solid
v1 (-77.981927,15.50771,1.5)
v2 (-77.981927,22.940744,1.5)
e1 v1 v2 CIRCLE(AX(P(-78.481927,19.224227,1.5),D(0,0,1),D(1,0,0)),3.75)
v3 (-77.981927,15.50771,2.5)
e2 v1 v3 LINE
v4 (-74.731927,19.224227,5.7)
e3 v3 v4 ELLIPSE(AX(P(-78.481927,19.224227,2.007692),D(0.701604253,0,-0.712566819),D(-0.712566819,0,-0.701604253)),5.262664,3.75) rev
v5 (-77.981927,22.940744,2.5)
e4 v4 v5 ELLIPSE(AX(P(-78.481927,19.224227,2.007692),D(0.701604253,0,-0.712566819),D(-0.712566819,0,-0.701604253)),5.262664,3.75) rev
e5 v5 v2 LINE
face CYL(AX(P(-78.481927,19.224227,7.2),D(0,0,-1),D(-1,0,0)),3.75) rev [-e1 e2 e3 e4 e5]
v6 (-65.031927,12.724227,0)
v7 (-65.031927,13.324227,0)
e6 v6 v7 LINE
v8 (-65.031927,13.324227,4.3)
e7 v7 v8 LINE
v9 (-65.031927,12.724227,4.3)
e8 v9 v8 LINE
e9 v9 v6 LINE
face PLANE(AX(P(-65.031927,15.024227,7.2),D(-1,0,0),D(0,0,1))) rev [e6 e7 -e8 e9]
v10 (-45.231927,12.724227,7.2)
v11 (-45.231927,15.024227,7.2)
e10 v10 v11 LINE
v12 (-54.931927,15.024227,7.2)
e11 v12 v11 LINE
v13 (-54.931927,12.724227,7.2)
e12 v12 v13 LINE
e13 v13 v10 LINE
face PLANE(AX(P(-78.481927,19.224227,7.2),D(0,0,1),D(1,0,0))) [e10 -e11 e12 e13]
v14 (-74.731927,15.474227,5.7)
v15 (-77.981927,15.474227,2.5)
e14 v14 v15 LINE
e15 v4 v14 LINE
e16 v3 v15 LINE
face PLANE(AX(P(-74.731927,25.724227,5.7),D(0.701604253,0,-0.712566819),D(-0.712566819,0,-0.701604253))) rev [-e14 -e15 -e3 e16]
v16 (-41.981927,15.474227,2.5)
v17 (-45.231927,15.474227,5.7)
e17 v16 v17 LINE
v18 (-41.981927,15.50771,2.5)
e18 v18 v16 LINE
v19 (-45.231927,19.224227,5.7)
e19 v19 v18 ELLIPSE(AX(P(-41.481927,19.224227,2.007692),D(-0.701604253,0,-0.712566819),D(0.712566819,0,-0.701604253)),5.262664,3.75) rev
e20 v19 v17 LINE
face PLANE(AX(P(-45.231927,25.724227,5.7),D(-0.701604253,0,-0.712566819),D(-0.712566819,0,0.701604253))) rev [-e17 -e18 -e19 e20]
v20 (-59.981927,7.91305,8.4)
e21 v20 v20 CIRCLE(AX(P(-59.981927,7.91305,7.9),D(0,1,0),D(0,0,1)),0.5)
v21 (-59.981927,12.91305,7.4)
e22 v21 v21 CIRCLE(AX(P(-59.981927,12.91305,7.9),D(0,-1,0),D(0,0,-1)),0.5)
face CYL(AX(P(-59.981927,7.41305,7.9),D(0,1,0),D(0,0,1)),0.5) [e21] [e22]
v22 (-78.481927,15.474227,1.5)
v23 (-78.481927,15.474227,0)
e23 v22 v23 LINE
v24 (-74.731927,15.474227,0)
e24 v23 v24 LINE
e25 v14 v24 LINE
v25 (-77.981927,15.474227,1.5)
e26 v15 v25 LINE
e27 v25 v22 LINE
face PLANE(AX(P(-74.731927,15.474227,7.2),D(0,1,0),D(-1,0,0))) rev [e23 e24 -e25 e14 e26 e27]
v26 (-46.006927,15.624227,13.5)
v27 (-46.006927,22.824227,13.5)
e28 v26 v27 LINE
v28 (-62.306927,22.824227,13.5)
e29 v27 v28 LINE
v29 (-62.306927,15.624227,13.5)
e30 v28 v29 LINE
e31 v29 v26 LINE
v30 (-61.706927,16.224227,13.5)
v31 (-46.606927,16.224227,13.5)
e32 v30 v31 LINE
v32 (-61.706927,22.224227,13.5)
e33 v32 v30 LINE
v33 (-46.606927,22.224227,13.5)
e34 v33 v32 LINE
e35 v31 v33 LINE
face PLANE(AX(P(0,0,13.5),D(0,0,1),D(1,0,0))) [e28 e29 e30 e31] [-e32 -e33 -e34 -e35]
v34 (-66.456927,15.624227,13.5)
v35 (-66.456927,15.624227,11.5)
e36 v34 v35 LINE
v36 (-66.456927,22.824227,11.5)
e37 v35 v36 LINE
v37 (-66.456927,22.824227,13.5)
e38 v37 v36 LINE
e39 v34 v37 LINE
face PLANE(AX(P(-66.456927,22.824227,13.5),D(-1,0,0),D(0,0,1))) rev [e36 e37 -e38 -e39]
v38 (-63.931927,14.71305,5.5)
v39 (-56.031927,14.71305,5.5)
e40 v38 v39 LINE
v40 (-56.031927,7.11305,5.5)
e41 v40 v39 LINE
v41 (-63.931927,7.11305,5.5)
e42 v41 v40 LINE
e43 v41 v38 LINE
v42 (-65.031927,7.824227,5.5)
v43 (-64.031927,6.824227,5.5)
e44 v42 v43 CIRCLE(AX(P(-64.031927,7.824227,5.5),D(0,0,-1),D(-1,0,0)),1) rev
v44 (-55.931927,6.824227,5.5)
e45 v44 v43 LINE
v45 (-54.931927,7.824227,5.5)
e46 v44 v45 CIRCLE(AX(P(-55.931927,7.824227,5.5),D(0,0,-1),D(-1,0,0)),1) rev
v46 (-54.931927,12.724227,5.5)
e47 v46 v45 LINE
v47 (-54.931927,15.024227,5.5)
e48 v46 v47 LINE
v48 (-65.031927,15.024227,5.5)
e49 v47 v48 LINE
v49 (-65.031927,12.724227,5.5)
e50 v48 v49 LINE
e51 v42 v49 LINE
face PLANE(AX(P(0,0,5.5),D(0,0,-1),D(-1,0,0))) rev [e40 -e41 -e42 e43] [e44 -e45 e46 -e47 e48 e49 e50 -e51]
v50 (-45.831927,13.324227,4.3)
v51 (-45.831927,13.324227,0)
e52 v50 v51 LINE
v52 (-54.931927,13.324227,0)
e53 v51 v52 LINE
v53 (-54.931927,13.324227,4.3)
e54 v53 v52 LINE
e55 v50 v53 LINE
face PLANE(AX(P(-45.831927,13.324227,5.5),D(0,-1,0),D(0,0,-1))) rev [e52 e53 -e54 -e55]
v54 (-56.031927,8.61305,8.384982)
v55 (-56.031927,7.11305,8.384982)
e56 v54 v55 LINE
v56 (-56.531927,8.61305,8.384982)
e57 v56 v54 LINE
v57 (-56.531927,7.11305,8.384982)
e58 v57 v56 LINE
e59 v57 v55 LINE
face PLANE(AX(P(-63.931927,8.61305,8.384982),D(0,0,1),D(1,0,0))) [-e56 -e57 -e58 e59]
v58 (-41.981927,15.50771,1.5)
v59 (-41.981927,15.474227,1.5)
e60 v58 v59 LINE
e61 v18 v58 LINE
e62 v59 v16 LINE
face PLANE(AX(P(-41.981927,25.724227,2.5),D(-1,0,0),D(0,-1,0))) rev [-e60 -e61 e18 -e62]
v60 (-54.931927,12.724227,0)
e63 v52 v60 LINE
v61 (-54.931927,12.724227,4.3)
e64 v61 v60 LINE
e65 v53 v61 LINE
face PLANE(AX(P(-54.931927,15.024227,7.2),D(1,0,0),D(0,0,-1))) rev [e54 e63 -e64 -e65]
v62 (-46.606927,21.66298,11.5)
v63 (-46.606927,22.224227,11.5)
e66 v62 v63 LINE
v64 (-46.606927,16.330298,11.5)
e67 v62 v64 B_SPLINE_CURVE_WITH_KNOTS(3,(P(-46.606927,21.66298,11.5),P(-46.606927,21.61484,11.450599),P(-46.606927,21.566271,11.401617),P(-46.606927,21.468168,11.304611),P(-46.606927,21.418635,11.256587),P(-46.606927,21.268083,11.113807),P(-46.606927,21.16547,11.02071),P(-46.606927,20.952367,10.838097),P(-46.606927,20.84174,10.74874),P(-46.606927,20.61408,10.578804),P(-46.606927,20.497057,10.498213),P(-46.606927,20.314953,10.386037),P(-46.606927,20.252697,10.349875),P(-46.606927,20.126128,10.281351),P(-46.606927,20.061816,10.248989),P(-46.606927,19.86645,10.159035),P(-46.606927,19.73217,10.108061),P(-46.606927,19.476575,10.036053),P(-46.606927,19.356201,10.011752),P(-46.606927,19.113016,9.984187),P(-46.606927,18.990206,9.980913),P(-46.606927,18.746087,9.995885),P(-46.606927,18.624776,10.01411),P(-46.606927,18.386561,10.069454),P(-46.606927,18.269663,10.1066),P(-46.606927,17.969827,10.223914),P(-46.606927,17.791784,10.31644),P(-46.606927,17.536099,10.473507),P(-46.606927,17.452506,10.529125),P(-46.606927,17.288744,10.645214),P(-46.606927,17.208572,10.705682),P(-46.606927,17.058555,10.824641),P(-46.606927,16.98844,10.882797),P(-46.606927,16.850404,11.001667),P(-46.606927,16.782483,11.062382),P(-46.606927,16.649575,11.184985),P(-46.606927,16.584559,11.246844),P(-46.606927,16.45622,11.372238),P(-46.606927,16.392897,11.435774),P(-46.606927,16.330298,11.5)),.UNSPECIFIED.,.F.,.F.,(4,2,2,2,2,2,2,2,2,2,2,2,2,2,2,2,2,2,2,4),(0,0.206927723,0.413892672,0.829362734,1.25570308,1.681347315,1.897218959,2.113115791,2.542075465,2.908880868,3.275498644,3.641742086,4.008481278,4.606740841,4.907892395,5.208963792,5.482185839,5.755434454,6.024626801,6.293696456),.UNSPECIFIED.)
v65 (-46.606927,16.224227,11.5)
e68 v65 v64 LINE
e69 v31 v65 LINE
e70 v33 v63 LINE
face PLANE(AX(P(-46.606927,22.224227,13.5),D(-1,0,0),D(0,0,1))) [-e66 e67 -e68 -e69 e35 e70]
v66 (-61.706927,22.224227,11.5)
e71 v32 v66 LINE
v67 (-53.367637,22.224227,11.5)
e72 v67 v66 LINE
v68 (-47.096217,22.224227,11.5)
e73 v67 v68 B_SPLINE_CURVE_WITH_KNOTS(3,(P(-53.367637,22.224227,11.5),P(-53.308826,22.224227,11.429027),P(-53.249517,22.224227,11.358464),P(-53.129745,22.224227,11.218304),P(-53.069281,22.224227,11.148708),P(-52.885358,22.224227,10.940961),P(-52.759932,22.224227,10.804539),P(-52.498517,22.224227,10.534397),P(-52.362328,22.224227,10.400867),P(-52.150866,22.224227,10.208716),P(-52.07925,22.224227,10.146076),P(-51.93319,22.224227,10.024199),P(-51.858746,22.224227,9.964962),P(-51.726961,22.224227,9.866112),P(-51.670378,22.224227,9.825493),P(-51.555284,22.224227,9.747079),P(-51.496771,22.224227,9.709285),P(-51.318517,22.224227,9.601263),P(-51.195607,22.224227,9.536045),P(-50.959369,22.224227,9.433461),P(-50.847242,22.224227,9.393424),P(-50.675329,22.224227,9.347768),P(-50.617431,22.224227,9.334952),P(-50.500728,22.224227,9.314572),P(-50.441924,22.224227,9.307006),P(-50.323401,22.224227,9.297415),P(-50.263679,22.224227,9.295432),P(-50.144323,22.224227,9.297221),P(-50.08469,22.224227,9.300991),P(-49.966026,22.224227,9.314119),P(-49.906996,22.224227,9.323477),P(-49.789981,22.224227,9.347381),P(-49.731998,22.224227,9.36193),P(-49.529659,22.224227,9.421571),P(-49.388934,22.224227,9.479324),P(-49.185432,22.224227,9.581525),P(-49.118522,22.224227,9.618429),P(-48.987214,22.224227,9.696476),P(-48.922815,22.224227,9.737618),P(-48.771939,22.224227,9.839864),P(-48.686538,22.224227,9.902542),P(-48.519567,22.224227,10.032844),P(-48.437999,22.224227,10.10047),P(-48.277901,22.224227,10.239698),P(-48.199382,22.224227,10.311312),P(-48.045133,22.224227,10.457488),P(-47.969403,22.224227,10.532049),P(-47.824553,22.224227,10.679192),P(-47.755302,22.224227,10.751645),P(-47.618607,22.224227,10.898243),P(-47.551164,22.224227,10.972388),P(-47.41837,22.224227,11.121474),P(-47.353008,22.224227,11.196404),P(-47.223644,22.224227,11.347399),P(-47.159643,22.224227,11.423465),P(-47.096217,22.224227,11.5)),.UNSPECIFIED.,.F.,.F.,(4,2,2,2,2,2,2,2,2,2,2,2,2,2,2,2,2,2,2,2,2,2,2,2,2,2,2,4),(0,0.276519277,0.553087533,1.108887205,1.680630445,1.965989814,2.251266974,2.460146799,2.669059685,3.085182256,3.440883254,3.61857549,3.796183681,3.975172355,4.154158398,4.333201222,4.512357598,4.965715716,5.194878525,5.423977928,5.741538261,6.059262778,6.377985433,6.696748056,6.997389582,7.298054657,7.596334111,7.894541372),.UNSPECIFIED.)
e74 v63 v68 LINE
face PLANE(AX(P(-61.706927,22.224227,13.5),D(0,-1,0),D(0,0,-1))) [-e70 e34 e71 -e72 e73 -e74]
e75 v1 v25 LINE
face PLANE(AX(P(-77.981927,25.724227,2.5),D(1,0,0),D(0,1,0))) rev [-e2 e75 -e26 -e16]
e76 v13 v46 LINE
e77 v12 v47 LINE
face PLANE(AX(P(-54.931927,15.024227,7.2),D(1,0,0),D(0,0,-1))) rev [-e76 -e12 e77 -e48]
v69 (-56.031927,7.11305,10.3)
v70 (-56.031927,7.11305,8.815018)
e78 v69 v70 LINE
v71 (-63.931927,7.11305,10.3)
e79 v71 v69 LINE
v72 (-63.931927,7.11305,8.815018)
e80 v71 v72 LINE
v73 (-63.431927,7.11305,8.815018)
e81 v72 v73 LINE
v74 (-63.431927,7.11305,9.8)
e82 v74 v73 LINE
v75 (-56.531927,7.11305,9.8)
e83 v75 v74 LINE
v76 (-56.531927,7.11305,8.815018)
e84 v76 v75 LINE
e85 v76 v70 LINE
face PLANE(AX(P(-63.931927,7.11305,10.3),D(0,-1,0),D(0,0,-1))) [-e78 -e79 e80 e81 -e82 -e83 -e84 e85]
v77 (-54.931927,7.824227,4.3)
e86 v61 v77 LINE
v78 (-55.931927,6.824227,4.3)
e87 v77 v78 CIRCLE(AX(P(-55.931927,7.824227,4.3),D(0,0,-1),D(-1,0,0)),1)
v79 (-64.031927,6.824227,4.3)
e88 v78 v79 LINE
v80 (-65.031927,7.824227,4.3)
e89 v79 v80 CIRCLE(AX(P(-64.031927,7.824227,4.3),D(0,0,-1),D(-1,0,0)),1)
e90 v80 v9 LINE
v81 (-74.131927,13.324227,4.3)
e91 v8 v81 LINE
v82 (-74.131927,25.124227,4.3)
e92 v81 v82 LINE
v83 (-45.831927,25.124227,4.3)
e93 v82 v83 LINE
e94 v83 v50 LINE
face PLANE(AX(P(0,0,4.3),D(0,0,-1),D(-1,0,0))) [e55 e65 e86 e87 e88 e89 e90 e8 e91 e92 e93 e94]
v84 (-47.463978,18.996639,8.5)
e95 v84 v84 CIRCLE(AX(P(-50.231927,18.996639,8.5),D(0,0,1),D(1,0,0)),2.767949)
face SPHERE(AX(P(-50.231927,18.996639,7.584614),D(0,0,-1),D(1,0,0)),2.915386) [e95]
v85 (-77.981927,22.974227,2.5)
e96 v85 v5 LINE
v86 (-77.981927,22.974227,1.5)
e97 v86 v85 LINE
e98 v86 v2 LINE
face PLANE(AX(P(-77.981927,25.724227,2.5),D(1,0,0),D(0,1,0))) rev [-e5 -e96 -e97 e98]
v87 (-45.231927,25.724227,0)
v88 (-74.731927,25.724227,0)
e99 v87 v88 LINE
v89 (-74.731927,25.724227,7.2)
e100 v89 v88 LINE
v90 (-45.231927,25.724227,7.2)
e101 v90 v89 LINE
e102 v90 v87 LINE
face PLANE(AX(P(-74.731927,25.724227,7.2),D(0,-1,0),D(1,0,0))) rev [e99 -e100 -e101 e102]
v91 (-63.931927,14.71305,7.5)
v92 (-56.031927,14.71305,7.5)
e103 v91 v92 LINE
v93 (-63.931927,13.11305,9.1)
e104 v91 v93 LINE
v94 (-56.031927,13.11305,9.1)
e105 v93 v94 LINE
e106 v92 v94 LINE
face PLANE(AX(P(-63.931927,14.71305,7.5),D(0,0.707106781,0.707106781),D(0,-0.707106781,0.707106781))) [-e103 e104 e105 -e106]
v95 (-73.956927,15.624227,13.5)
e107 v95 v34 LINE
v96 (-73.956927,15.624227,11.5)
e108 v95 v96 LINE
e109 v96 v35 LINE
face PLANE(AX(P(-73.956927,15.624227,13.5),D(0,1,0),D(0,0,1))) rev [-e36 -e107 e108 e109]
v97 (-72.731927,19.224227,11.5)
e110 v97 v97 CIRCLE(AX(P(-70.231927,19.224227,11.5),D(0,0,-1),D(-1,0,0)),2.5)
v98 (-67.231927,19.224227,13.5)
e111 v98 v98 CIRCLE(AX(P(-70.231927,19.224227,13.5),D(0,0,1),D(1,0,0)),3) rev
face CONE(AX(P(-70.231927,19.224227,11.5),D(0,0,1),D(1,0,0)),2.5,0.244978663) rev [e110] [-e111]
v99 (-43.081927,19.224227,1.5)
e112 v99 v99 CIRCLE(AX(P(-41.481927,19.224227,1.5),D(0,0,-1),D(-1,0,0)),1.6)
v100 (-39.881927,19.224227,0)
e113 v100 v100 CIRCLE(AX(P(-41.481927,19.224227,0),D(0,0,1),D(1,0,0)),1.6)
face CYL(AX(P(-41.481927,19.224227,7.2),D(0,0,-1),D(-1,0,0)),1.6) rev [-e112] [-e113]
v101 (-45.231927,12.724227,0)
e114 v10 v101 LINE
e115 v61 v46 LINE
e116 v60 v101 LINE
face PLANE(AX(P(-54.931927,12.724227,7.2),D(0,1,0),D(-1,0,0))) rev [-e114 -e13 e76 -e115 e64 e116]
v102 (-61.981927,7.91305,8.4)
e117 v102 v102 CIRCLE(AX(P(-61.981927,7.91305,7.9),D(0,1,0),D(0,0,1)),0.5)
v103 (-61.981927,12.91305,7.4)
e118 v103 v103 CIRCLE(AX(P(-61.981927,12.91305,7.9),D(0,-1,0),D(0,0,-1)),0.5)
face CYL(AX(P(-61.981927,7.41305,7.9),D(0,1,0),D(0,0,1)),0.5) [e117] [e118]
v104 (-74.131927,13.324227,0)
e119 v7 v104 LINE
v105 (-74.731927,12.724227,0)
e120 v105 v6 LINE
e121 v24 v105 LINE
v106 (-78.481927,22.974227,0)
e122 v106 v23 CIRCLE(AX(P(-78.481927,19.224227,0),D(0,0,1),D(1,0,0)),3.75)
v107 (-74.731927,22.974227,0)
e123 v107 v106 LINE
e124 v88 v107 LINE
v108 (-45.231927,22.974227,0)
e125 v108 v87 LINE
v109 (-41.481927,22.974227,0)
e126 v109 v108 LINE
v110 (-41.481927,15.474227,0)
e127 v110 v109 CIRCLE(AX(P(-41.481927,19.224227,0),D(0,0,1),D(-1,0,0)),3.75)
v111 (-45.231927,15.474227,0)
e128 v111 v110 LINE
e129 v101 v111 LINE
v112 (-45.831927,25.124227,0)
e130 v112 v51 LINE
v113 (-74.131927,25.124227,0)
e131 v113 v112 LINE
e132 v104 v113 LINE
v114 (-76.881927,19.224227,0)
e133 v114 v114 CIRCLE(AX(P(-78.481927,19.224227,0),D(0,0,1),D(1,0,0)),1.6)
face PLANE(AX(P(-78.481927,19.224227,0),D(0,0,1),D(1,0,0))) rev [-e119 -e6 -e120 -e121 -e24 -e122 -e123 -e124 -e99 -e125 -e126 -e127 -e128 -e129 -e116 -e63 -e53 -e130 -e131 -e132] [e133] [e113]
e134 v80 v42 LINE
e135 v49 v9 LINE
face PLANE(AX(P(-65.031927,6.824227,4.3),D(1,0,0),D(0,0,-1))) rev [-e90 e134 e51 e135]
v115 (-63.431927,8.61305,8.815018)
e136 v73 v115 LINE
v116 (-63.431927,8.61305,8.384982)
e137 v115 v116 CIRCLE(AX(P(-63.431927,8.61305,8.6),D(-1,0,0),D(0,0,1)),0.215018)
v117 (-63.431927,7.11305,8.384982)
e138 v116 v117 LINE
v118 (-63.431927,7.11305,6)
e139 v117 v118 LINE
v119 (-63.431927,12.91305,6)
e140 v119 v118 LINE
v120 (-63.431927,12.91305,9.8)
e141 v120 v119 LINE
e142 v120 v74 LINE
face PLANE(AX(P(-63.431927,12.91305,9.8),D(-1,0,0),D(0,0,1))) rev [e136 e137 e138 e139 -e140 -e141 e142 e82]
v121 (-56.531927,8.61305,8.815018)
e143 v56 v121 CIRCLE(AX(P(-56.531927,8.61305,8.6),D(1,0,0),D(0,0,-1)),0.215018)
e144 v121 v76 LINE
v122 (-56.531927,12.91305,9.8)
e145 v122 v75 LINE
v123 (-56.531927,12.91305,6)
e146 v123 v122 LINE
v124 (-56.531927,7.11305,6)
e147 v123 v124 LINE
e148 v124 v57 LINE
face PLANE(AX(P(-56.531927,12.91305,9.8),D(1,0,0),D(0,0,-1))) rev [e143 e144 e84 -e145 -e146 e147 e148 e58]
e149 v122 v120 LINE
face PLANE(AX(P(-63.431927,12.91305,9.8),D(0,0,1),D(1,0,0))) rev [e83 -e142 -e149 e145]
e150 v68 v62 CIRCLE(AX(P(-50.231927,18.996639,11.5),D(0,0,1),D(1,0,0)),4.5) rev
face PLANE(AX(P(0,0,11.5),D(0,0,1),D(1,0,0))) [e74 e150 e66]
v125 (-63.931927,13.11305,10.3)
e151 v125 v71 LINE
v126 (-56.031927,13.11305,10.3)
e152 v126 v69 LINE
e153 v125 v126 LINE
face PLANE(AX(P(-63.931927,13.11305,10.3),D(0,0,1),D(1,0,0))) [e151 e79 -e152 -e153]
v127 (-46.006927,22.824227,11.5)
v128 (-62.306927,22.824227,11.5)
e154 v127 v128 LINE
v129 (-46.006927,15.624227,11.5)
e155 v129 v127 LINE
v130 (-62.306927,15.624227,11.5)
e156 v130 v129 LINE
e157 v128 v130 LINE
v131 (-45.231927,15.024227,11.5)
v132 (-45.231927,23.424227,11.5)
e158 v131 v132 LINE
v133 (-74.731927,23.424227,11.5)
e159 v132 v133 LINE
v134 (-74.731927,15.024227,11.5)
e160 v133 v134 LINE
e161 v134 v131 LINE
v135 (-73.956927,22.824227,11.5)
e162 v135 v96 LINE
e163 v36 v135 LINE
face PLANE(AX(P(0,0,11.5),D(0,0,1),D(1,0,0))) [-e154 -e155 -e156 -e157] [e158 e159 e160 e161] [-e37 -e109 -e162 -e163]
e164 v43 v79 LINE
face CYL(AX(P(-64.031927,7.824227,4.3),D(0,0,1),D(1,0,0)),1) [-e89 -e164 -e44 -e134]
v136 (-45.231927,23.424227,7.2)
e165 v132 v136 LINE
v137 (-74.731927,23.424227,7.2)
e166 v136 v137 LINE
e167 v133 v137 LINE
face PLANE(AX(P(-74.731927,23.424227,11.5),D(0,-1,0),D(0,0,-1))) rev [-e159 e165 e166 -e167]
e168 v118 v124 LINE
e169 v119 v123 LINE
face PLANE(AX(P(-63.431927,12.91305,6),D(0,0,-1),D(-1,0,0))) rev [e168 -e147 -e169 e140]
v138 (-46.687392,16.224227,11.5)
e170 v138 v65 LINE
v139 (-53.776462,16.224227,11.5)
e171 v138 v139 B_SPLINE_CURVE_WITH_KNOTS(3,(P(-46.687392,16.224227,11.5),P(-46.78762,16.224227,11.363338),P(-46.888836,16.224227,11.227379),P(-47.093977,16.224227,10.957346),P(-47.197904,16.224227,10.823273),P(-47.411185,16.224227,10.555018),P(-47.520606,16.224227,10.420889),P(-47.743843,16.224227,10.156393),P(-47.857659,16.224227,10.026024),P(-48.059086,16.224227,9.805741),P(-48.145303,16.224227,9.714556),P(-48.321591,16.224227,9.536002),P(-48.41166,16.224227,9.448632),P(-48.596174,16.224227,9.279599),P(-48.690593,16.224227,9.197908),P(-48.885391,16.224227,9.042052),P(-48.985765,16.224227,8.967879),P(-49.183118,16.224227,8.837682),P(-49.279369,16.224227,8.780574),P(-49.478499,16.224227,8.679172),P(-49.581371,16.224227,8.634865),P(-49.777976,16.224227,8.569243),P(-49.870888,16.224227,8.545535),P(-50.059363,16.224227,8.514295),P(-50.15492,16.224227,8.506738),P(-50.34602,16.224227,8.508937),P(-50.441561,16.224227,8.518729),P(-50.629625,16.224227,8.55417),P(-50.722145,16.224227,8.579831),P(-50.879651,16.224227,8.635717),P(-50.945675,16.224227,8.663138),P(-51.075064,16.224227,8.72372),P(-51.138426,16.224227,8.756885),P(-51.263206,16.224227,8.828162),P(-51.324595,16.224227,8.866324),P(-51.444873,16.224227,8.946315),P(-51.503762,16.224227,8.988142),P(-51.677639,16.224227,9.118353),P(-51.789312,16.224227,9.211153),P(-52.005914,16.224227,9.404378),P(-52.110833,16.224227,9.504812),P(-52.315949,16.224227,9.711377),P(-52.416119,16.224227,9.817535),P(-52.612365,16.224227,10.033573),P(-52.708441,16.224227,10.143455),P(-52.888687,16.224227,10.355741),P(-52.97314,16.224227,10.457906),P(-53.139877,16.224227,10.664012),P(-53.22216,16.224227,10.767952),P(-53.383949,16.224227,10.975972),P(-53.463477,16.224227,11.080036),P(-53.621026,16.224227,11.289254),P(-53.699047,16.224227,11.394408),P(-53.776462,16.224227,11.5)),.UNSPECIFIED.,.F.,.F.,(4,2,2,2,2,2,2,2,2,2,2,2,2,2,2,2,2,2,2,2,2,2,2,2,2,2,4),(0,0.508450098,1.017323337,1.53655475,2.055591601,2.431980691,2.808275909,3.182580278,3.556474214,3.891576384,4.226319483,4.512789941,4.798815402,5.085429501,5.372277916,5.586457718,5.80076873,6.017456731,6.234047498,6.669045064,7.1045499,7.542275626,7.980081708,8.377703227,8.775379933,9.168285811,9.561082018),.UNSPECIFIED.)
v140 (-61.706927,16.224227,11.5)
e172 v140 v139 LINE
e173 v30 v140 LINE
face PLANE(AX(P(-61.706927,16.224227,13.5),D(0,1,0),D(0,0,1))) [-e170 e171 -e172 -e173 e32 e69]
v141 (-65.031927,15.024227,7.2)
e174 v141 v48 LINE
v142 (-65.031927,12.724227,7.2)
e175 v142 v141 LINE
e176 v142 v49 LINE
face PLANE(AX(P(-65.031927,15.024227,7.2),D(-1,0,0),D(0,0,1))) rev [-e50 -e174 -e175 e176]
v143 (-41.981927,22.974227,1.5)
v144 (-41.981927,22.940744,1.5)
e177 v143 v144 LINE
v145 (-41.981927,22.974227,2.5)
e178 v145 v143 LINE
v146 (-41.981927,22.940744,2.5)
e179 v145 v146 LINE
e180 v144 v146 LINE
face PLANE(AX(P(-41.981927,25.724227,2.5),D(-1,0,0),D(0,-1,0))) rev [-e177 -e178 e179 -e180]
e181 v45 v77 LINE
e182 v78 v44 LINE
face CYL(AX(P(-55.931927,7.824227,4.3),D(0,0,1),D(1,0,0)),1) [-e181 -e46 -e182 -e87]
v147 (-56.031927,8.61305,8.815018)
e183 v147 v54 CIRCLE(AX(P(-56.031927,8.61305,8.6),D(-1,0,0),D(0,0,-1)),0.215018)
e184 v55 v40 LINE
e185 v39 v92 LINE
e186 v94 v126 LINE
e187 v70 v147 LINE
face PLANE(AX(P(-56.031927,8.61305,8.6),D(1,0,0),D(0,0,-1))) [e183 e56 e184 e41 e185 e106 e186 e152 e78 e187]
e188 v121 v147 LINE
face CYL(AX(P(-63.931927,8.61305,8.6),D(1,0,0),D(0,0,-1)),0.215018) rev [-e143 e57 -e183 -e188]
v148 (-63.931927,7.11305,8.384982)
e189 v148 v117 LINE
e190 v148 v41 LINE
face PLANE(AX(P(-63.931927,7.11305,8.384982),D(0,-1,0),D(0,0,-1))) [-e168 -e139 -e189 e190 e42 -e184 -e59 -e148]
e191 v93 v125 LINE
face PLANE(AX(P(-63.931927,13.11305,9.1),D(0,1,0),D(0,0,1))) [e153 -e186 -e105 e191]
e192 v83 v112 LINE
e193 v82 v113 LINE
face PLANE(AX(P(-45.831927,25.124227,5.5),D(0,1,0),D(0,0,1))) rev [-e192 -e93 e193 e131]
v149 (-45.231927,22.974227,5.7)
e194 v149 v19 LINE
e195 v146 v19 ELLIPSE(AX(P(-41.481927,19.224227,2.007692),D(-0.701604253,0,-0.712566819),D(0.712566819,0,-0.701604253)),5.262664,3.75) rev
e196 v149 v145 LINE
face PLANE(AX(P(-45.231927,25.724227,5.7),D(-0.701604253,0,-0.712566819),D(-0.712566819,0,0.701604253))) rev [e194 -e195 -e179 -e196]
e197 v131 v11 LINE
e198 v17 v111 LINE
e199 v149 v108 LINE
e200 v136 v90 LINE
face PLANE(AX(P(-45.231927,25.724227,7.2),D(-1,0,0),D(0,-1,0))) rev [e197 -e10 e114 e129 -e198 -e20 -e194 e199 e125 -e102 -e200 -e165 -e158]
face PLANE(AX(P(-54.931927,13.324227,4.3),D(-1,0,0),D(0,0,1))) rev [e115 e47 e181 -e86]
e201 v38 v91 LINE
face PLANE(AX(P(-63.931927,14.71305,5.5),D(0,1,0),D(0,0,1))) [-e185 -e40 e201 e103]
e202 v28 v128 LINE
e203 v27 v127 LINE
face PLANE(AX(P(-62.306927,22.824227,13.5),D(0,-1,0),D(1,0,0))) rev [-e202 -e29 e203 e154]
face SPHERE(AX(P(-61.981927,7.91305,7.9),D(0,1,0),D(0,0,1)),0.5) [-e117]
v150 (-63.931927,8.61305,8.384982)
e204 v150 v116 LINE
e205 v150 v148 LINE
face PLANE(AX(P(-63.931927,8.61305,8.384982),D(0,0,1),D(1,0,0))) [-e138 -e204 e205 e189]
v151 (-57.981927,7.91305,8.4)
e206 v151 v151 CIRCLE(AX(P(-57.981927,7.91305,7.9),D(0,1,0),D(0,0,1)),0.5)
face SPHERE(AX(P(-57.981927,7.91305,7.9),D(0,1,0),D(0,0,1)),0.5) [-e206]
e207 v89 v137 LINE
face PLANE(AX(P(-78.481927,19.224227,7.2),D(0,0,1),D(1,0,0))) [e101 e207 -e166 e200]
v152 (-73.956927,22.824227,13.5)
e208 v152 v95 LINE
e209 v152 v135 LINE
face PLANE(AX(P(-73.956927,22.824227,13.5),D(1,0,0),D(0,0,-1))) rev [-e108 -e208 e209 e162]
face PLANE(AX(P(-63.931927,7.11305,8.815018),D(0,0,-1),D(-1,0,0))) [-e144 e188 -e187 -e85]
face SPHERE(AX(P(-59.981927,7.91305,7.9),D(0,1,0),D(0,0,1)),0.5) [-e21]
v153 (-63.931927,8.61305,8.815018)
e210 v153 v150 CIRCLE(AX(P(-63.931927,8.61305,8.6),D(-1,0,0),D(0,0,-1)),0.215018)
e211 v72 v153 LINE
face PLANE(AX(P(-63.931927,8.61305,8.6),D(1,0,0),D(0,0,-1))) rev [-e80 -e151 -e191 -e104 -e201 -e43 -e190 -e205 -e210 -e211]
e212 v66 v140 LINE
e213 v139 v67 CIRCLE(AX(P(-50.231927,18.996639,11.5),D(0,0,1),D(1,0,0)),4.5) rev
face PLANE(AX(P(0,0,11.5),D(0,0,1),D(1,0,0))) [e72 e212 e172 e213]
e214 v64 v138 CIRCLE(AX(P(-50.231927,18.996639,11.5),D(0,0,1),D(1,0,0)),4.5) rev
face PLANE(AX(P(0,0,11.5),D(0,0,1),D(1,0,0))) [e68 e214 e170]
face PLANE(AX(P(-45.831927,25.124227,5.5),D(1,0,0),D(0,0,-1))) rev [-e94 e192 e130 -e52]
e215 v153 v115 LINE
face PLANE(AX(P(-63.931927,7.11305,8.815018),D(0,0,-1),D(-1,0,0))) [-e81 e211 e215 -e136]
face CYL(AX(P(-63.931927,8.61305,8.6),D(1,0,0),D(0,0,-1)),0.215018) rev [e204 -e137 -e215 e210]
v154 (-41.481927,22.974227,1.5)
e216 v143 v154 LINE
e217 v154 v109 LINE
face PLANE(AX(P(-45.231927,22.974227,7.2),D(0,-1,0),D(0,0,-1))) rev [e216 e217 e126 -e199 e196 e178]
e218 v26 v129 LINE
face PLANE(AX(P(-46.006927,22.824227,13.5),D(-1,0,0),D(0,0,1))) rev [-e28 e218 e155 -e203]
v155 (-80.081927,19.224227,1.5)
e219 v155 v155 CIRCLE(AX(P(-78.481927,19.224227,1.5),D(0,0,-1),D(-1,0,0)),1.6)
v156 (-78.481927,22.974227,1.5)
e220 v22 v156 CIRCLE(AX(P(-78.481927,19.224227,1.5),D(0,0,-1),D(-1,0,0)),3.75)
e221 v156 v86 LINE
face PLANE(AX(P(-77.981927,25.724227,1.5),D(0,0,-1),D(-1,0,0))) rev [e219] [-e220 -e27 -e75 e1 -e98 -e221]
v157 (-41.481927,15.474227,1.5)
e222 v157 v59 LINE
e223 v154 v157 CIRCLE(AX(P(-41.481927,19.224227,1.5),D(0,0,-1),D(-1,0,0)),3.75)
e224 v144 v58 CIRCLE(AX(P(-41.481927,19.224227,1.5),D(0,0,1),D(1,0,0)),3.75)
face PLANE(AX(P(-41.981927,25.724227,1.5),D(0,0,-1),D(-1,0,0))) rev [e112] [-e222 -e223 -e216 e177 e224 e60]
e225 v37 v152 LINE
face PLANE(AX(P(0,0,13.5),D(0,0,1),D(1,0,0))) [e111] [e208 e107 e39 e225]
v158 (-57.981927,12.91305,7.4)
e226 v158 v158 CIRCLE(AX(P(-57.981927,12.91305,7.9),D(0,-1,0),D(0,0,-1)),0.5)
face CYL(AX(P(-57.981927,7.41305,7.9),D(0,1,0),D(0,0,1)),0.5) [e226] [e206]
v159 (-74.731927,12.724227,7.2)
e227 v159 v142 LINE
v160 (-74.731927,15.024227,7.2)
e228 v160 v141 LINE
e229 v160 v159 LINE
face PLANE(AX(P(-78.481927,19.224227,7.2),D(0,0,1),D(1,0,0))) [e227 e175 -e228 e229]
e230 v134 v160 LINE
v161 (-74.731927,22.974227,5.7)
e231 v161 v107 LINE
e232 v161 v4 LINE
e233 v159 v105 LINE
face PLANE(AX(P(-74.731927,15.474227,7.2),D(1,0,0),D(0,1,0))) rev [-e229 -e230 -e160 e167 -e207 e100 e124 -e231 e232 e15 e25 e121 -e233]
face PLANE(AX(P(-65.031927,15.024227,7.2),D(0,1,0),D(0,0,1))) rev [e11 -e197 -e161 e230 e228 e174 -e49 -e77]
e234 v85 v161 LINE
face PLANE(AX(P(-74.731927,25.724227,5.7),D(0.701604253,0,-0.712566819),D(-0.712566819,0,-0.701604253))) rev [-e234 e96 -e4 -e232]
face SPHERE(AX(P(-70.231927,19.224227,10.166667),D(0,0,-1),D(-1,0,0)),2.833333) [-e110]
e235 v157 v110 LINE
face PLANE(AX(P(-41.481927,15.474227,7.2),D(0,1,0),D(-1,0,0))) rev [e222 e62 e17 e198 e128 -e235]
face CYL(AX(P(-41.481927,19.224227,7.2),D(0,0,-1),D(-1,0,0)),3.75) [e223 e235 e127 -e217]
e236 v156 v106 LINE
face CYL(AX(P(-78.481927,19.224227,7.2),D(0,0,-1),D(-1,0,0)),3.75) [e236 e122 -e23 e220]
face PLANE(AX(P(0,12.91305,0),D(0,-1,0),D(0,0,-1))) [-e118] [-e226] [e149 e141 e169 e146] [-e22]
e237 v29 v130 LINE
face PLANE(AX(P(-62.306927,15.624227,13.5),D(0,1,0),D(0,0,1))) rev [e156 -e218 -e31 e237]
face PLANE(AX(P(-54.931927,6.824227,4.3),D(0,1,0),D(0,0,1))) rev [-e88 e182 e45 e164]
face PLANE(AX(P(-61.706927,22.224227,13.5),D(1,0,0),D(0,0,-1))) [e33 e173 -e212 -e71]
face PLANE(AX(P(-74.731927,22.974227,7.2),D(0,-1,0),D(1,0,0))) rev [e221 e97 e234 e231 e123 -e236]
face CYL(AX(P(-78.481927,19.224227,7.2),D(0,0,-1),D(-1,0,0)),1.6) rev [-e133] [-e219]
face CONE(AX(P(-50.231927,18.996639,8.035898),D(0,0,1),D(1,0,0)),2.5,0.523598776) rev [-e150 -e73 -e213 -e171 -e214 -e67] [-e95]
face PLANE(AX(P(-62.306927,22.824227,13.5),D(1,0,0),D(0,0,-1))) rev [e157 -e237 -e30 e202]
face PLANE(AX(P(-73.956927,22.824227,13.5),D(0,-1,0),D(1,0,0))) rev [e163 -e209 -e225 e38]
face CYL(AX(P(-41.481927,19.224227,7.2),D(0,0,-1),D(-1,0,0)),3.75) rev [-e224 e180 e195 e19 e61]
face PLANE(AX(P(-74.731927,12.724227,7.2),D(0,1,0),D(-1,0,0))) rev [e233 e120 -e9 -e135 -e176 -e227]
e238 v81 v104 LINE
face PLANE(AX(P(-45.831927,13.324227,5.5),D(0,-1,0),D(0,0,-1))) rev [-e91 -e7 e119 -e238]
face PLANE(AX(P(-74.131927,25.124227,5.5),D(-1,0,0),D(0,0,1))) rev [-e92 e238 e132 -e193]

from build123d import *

# Parameters (mm, degrees)
SKETCH2_R                = 1.6
BOSS_EXTRUDE1_DEPTH      = 7.2
CUT_EXTRUDE1_DEPTH       = 84.563926387
SKETCH5_R                = 3.75
CUT_EXTRUDE2_DEPTH       = 87.349960246
SKETCH6_W                = 29.5
SKETCH6_H                = 8.4
BOSS_EXTRUDE2_DEPTH      = 4.3
SKETCH7_W                = 7.5
SKETCH7_H                = 7.2
SKETCH7_R                = 2.5
SKETCH7_W_2              = 16.3
SKETCH7_W_3              = 15.1
SKETCH7_H_2              = 6
BOSS_EXTRUDE3_DEPTH      = 2
CHAMFER1_SIZE2           = 2
CHAMFER1_SIZE            = 0.5
SKETCH8_R                = 2.5
CUT_EXTRUDE3_DEPTH       = 3
CHAMFER2_SIZE            = 2
CHAMFER2_SIZE_2          = 3.464101615
SKETCH9_W                = 28.3
SKETCH9_H                = 11.8
CUT_EXTRUDE4_DEPTH       = 5.5
BOSS_EXTRUDE4_DEPTH      = 1.2
FILLET1_R                = 1
BOSS_EXTRUDE5_DEPTH      = 3.95
BOSS_EXTRUDE5_DEPTH_BACK = 3.95
SKETCH17_W               = 6.9
SKETCH17_H               = 3.8
CUT_EXTRUDE5_DEPTH       = 5.8
SKETCH18_R               = 0.5
BOSS_EXTRUDE6_DEPTH      = 5.5
FILLET2_R                = 0.5


# Some blends are built 0.0001 mm under size
with BuildPart() as part:
    # Sketch2 → Boss-Extrude1 (new body)
    with BuildSketch(Plane.XY):
        with BuildLine():
            Line((-74.731926848, 25.724226739), (-45.231926848, 25.724226739))
            Line((-45.231926848, 25.724226739), (-45.231926848, 22.974226739))
            Line((-45.231926848, 22.974226739), (-41.481926848, 22.974226739))
            ThreePointArc((-41.481926848, 22.974226739), (-37.731926848, 19.224226739), (-41.481926848, 15.474226739))
            Line((-41.481926848, 15.474226739), (-45.231926848, 15.474226739))
            Line((-45.231926848, 15.474226739), (-45.231926848, 12.724226739))
            Line((-45.231926848, 12.724226739), (-54.931926848, 12.724226739))
            Line((-54.931926848, 12.724226739), (-54.931926848, 15.024226739))
            Line((-54.931926848, 15.024226739), (-65.031926848, 15.024226739))
            Line((-65.031926848, 15.024226739), (-65.031926848, 12.724226739))
            Line((-65.031926848, 12.724226739), (-74.731926848, 12.724226739))
            Line((-74.731926848, 12.724226739), (-74.731926848, 15.474226739))
            Line((-74.731926848, 15.474226739), (-78.481926848, 15.474226739))
            ThreePointArc((-78.481926848, 15.474226739), (-82.231926848, 19.224226739), (-78.481926848, 22.974226739))
            Line((-78.481926848, 22.974226739), (-74.731926848, 22.974226739))
            Line((-74.731926848, 22.974226739), (-74.731926848, 25.724226739))
        make_face()
        with Locations((-78.481926848, 19.224226739)):
            Circle(SKETCH2_R, mode=Mode.SUBTRACT)
        with Locations((-41.481926848, 19.224226739)):
            Circle(SKETCH2_R, mode=Mode.SUBTRACT)
    extrude(amount=BOSS_EXTRUDE1_DEPTH)

    # Sketch4 → Cut-Extrude1 (cut, through all)
    with BuildSketch(Plane.XZ.offset(-12.724226739)):
        Polygon((-74.731926848, 5.7), (-77.981926848, 2.5), (-77.981926848, 1.5), (-84.83036896, 1.5), (-84.83036896, 9.527639916), (-74.731926848, 9.527639916), align=None)
        Polygon((-45.231926848, 9.527639916), (-45.231926848, 5.7), (-41.981926848, 2.5), (-41.981926848, 1.5), (-35.133484736, 1.5), (-35.133484736, 9.527639916), align=None)
    extrude(amount=-CUT_EXTRUDE1_DEPTH, mode=Mode.SUBTRACT)

    # Sketch5 → Cut-Extrude2 (cut, through all)
    with BuildSketch(Plane.XY.offset(1.5)):
        with Locations((-78.481926848, 19.224226739)):
            Circle(SKETCH5_R)
        with Locations((-41.481926848, 19.224226739)):
            Circle(SKETCH5_R)
    extrude(amount=CUT_EXTRUDE2_DEPTH, mode=Mode.SUBTRACT)

    # Sketch6 → Boss-Extrude2 (add)
    with BuildSketch(Plane.XY.offset(7.2)):
        with Locations((-59.981926848, 19.224226739)):
            Rectangle(SKETCH6_W, SKETCH6_H)
    extrude(amount=BOSS_EXTRUDE2_DEPTH)

    # Sketch7 → Boss-Extrude3 (add)
    # profile 1 of 2: a face of its own
    with BuildSketch(Plane.XY.offset(11.5)):
        with Locations((-70.206926848, 19.224226739)):
            Rectangle(SKETCH7_W, SKETCH7_H)
        with Locations((-70.231926848, 19.224226739)):
            Circle(SKETCH7_R, mode=Mode.SUBTRACT)
    # profile 2 of 2: a face of its own
    with BuildSketch(Plane.XY.offset(11.5)):
        with Locations((-54.156926848, 19.224226739)):
            Rectangle(SKETCH7_W_2, SKETCH7_H)
        with Locations((-54.156926848, 19.224226739)):
            Rectangle(SKETCH7_W_3, SKETCH7_H_2, mode=Mode.SUBTRACT)
    extrude(amount=BOSS_EXTRUDE3_DEPTH)

    # Chamfer1
    chamfer1_edges = [part.edges().sort_by_distance(p)[0] for p in [
        (-72.731926848, 19.224226739, 13.5),
    ]]
    chamfer1_side = [part.faces().sort_by_distance(p)[0] for p in [
        (-72.741926848, 19.224226739, 13.5),
    ]]
    chamfer(chamfer1_edges, length=CHAMFER1_SIZE - 0.0001, length2=CHAMFER1_SIZE2 - 0.0001, reference=chamfer1_side[0])  # a hair under: the kernel refuses the full size

    # Sketch8 → Cut-Extrude3 (cut)
    with BuildSketch(Plane.XY.offset(11.5)):
        with Locations((-50.231926848, 18.99663901)):
            Circle(SKETCH8_R)
    extrude(amount=-CUT_EXTRUDE3_DEPTH, mode=Mode.SUBTRACT)

    # Chamfer2
    # the kernel refuses this chamfer: 3.464101615, 2 mm, written as the material it takes off along each edge
    with BuildSketch(Plane(origin=(-50.231926848, 18.99663901, 11.5), x_dir=(1, 0, 0), z_dir=(0, -1, 0))) as chamfer2_piece_1_section:
        Polygon((2.5 + CHAMFER2_SIZE, 0), (2.5, -CHAMFER2_SIZE_2), (2.5, 0), align=None)
    chamfer2_piece_1 = revolve(axis=Axis((-50.231926848, 18.99663901, 11.5), (0, 0, 1)), mode=Mode.PRIVATE)
    chamfer2_piece_1 = split(chamfer2_piece_1, bisect_by=Plane(origin=(-53.833665029, 16.224226739, 10.018611703), z_dir=(0, 1, 0)), keep=Keep.TOP, mode=Mode.PRIVATE)
    chamfer2_piece_1 = split(chamfer2_piece_1, bisect_by=Plane(origin=(-46.606926848, 18.99663901, 10.018611703), z_dir=(-1, 0, 0)), keep=Keep.TOP, mode=Mode.PRIVATE)
    chamfer2_piece_1 = split(chamfer2_piece_1, bisect_by=Plane(origin=(-53.833665029, 22.224226739, 10.018611703), z_dir=(0, -1, 0)), keep=Keep.TOP, mode=Mode.PRIVATE)
    chamfer2_piece_1 = split(chamfer2_piece_1, bisect_by=Plane(origin=(-53.833665029, 18.99663901, 8.5), z_dir=(0, 0, 1)), keep=Keep.TOP, mode=Mode.PRIVATE)
    add(chamfer2_piece_1, mode=Mode.SUBTRACT)

    # Sketch9 → Cut-Extrude4 (cut)
    with BuildSketch(Plane(origin=(0, 0, 0), x_dir=(-1, 0, 0), z_dir=(0, 0, -1))):
        with Locations((59.981926848, 19.224226739)):
            Rectangle(SKETCH9_W, SKETCH9_H)
    extrude(amount=-CUT_EXTRUDE4_DEPTH, mode=Mode.SUBTRACT)

    # Sketch10 → Boss-Extrude4 (add)
    with BuildSketch(Plane(origin=(0, 0, 5.5), x_dir=(-1, 0, 0), z_dir=(0, 0, -1))):
        Polygon((54.931926848, 13.324226739), (54.931926848, 6.824226739), (65.031926848, 6.824226739), (65.031926848, 13.324226739), (74.131926848, 13.324226739), (74.131926848, 25.124226739), (45.831926848, 25.124226739), (45.831926848, 13.324226739), align=None)
    extrude(amount=BOSS_EXTRUDE4_DEPTH)

    # Sketch11 → Revolve1 (revolve)
    with BuildSketch(Plane(origin=(0, 18.99663901, 0), x_dir=(1, 0, 0), z_dir=(0, 1, 0))):
        with BuildLine():
            Line((-50.231926848, -8.5), (-47.463977656, -8.5))
            ThreePointArc((-47.463977656, -8.5), (-48.524476795, -9.947681814), (-50.231926848, -10.5))
            Line((-50.231926848, -10.5), (-50.231926848, -8.5))
        make_face()
    revolve(axis=Axis((-50.231926848, 18.99663901, 8.5), (0, 0, 1)))

    # Sketch14 → Revolve2 (revolve)
    with BuildSketch(Plane(origin=(0, 19.224226739, 0), x_dir=(-1, 0, 0), z_dir=(0, -1, 0)), mode=Mode.PRIVATE) as revolve2_sk:
        with BuildLine():
            Line((70.231926848, -11.5), (72.731926848, -11.5))
            ThreePointArc((72.731926848, -11.5), (71.689664822, -12.596229956), (70.231926848, -13))
            Line((70.231926848, -13), (70.231926848, -11.5))
        make_face()
    revolve(revolve2_sk.sketch.rotate(Axis((-70.231926848, 19.224226739, 11.5), (0, 0, 1)), 180), axis=Axis((-70.231926848, 19.224226739, 11.5), (0, 0, 1)))

    # Fillet1
    fillet1_edges = [part.edges().sort_by_distance(p)[0] for p in [
        (-65.031926848, 6.824226739, 4.9),
        (-54.931926848, 6.824226739, 4.9),
    ]]
    fillet(fillet1_edges, radius=FILLET1_R)

    # Sketch16 → Boss-Extrude5 (add, two sides: drawn at the far end of the back side and taken through both)
    with BuildSketch(Plane(origin=(-59.981926848, 0, 0), x_dir=(0, 0, -1), z_dir=(1, 0, 0)).offset(-BOSS_EXTRUDE5_DEPTH_BACK)):
        with BuildLine():
            Line((-8.384982209, 8.613050121), (-8.384982209, 7.113050121))
            Line((-8.384982209, 7.113050121), (-5.5, 7.113050121))
            Line((-5.5, 7.113050121), (-5.5, 14.713050121))
            Line((-5.5, 14.713050121), (-7.5, 14.713050121))
            Line((-7.5, 14.713050121), (-9.1, 13.113050121))
            Line((-9.1, 13.113050121), (-10.3, 13.113050121))
            Line((-10.3, 13.113050121), (-10.3, 7.113050121))
            Line((-10.3, 7.113050121), (-8.815017791, 7.113050121))
            Line((-8.815017791, 7.113050121), (-8.815017791, 8.613050121))
            ThreePointArc((-8.815017791, 8.613050121), (-8.6, 8.828067912), (-8.384982209, 8.613050121))
        make_face()
    extrude(amount=BOSS_EXTRUDE5_DEPTH + BOSS_EXTRUDE5_DEPTH_BACK)

    # Sketch17 → Cut-Extrude5 (cut)
    with BuildSketch(Plane.XZ.offset(-7.113050121)):
        with Locations((-59.981926848, 7.9)):
            Rectangle(SKETCH17_W, SKETCH17_H)
    extrude(amount=-CUT_EXTRUDE5_DEPTH, mode=Mode.SUBTRACT)

    # Sketch18 → Boss-Extrude6 (add)
    with BuildSketch(Plane.XZ.offset(-12.913050121)):
        with Locations(Location((-59.981926848, 7.9, 0), (0, 0, 270))):
            Circle(SKETCH18_R)
        with Locations(Location((-57.981926848, 7.9, 0), (0, 0, 270))):
            Circle(SKETCH18_R)
        with Locations(Location((-61.981926848, 7.9, 0), (0, 0, 270))):
            Circle(SKETCH18_R)
    extrude(amount=BOSS_EXTRUDE6_DEPTH)

    # Fillet2
    fillet2_edges = [part.edges().sort_by_distance(p)[0] for p in [
        (-59.981926848, 7.413050121, 8.4),
        (-57.981926848, 7.413050121, 8.4),
        (-61.981926848, 7.413050121, 8.4),
    ]]
    fillet(fillet2_edges, radius=FILLET2_R)


solid = part.part
